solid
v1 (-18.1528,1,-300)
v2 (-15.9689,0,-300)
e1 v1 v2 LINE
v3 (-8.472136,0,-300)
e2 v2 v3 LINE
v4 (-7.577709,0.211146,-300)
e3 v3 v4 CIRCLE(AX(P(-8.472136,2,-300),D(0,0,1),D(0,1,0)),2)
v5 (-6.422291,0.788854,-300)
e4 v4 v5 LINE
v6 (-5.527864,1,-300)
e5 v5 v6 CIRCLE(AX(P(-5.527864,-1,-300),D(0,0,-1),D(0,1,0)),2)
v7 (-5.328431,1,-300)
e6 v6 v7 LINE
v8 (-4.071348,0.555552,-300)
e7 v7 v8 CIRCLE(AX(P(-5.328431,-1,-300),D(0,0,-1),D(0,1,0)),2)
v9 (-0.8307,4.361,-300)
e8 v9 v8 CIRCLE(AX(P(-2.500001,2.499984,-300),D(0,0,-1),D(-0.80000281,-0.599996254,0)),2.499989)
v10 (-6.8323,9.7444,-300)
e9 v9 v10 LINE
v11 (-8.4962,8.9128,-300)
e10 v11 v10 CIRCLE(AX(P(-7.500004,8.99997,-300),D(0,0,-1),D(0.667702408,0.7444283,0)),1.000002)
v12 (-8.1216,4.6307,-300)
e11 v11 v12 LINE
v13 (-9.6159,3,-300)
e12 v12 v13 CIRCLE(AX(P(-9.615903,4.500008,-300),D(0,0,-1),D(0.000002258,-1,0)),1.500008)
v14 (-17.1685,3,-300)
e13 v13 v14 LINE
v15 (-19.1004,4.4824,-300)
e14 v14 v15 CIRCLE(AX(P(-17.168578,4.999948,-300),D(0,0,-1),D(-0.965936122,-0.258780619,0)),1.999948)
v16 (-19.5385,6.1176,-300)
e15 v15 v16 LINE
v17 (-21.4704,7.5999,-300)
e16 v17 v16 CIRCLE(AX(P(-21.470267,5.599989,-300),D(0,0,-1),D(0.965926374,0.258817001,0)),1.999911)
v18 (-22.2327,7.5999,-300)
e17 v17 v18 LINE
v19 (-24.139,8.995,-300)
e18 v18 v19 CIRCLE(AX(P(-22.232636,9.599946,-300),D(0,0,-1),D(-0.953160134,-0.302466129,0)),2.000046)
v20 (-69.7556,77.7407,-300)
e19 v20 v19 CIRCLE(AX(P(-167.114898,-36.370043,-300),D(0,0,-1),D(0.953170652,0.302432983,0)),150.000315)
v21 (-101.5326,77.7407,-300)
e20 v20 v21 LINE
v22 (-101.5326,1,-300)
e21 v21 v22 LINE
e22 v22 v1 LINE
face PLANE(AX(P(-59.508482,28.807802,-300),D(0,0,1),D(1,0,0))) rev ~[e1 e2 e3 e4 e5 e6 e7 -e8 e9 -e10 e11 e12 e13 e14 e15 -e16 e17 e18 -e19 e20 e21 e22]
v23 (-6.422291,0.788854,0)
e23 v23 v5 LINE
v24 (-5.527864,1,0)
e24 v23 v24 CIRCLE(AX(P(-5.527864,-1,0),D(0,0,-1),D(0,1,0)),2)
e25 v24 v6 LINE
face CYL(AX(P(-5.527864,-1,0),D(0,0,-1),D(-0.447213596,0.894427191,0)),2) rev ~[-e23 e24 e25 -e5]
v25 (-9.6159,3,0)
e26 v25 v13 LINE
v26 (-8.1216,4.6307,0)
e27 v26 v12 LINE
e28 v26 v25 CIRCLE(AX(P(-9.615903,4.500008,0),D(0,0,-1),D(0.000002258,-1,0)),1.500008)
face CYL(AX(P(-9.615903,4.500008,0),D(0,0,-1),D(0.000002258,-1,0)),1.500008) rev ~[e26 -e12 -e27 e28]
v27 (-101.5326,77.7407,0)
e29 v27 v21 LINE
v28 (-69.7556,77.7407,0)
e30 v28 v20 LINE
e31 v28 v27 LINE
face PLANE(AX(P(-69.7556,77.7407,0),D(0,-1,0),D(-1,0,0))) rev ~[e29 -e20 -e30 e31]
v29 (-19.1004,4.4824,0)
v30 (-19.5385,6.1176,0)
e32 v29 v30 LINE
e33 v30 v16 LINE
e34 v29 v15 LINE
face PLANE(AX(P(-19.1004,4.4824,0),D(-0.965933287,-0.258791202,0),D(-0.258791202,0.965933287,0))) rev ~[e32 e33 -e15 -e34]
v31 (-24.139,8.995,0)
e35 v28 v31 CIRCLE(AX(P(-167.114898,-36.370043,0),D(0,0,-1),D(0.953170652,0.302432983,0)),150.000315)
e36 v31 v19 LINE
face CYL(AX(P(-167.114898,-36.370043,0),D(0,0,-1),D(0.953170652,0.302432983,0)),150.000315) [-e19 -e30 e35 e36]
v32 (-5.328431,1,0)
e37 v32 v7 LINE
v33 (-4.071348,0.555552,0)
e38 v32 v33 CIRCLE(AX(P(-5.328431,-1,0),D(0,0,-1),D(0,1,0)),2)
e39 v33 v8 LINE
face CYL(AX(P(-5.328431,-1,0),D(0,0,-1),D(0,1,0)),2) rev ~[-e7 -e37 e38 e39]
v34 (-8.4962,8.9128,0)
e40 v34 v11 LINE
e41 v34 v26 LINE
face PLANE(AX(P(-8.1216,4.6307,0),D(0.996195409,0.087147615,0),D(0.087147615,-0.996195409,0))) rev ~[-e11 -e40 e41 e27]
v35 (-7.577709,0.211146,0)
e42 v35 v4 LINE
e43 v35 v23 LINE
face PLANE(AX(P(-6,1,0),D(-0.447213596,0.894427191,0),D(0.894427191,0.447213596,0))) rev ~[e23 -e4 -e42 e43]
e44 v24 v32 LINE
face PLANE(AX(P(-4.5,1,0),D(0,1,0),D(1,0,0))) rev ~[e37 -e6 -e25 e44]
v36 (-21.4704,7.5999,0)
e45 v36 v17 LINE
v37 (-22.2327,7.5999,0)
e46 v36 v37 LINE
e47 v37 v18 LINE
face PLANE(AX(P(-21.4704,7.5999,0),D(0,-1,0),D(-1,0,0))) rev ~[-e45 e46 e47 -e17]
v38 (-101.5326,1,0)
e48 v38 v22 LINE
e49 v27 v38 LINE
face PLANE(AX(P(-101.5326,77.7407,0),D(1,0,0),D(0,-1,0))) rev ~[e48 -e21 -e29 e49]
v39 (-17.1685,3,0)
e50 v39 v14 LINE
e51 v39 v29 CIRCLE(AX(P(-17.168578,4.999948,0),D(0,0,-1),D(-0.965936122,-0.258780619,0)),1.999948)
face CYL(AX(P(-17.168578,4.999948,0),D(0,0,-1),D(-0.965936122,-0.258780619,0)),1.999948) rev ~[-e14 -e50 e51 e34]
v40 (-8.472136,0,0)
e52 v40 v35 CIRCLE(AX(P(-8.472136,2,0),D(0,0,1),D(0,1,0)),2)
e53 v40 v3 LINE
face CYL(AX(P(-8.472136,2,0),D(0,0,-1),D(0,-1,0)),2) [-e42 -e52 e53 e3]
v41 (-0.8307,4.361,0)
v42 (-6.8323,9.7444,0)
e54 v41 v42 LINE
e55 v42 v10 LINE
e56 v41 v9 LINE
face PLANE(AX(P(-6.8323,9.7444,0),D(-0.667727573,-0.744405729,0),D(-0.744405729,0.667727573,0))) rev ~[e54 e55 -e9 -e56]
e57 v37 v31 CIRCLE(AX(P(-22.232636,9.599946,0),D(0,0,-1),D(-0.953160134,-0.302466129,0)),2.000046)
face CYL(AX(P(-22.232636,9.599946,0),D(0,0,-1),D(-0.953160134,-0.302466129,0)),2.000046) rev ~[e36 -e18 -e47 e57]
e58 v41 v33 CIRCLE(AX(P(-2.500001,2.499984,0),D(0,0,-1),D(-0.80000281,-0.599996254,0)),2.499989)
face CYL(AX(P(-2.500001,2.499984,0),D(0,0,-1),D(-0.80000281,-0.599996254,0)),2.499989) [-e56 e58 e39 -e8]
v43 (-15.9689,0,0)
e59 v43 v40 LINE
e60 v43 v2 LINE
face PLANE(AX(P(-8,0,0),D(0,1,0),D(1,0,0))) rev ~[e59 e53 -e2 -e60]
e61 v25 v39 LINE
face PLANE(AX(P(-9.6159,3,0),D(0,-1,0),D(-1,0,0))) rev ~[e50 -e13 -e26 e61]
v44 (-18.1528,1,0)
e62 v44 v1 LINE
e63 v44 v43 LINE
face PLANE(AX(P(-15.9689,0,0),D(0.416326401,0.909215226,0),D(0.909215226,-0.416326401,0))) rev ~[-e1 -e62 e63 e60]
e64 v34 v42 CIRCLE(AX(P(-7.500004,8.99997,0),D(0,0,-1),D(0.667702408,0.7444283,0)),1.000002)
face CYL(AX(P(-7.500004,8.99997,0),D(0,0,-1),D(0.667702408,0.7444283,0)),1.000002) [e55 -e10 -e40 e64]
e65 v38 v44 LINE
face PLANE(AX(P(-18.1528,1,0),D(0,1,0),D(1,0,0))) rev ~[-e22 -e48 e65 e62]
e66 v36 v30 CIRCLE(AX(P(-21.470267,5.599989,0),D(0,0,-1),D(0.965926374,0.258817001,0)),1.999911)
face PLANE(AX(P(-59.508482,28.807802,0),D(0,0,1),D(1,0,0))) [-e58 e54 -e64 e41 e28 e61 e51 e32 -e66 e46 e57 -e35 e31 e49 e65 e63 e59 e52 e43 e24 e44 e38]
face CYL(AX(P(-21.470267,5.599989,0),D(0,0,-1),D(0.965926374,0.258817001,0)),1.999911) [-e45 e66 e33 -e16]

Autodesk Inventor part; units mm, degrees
ref_plane "YZ Plane" through (0, 0, 0) normal (1, 0, 0) x (0, 1, 0)
ref_plane "XZ Plane" through (0, 0, 0) normal (0, 1, 0) x (-1, 0, 0)
ref_plane "XY Plane" through (0, 0, 0) normal (0, 0, 1) x (1, 0, 0)
sketch "草圖3" plane through (0, 0, 0) normal (0, 1, 0) x (-1, 0, 0)
  line L0 (0, 0) -> (0, -300)
  dimension "d15" = 300
sketch "草圖1" plane through (0, 0, 0) normal (0, 0, 1) x (1, 0, 0)
  line L0 (0, 0) -> (-9.6483, 0) construction
  line L1 (0, 0) -> (0, 9.3404) construction
  line L2 (-8.1216, 4.6307) -> (-8.4962, 8.9128)
  arc A0 (-6.8323, 9.7444) -> (-8.4962, 8.9128) centre (-7.5, 9) ccw
  line L3 (-6.8323, 9.7444) -> (-0.8307, 4.361)
  arc A1 (-4.5, 1) -> (-0.8307, 4.361) centre (-2.5, 2.5) ccw
  line L4 (-4.5, 1) -> (-6, 1)
  line L5 (-6, 1) -> (-8, 0)
  line L6 (-8, 0) -> (-15.9689, 0)
  line L7 (-15.9689, 0) -> (-18.1528, 1)
  line L8 (-18.1528, 1) -> (-101.5326, 1)
  line L9 (-9.6159, 3) -> (-17.1685, 3)
  arc A2 (-9.6159, 3) -> (-8.1216, 4.6307) centre (-9.6159, 4.5) ccw
  line L10 (-19.1004, 4.4824) -> (-19.5385, 6.1176)
  line L11 (-21.4704, 7.5999) -> (-22.2327, 7.5999)
  arc A3 (-19.5385, 6.1176) -> (-21.4704, 7.5999) centre (-21.4704, 5.5999) ccw
  arc A4 (-19.1004, 4.4824) -> (-17.1685, 3) centre (-17.1685, 5) ccw
  line L12 (-14, 16.4786) -> (-11, 16.4786) construction
  line L13 (-11, 16.4786) -> (-11, 4.7787) construction
  line L14 (-11, 4.7787) -> (-14, 4.7787) construction
  line L15 (-14, 4.7787) -> (-14, 16.4786) construction
  arc A5 (-24.139, 8.995) -> (-69.7556, 77.7407) centre (-167.1146, -36.3699) ccw
  arc A6 (-24.139, 8.995) -> (-22.2327, 7.5999) centre (-22.2327, 9.5999) ccw
  line L16 (-69.7556, 77.7407) -> (-101.5326, 77.7407)
  line L17 (-101.5326, 77.7407) -> (-101.5326, 1)
  point P0 (-23.7038, 7.5999)
  point P1 (-12.5, 4.7787)
  dimension "d0" = 10
  dimension "d4" = 1
  dimension "d5" = 2.5
  dimension "d8" = 1.5
  dimension "d9" = 2
  dimension "d10" = 2
  dimension "d11" = 105
  dimension "d13" = 3
  dimension "d14" = 10
  dimension "d20" = 5
  dimension "d21" = 85
  dimension "d22" = 3
  dimension "d24" = 150
  dimension "d25" = 2
  dimension "d26" = 2
  dimension "d27" = 7.9689
  dimension "d28" = 2
  dimension "d29" = 1.5
sweep "掃掠1" add profiles "草圖1" path "草圖3"
fillet "圓角1" radius 2 3 edges at (-6, 1, -150) (-4.5, 1, -150) (-8, 0, -150)
properties part number "0 零件"
